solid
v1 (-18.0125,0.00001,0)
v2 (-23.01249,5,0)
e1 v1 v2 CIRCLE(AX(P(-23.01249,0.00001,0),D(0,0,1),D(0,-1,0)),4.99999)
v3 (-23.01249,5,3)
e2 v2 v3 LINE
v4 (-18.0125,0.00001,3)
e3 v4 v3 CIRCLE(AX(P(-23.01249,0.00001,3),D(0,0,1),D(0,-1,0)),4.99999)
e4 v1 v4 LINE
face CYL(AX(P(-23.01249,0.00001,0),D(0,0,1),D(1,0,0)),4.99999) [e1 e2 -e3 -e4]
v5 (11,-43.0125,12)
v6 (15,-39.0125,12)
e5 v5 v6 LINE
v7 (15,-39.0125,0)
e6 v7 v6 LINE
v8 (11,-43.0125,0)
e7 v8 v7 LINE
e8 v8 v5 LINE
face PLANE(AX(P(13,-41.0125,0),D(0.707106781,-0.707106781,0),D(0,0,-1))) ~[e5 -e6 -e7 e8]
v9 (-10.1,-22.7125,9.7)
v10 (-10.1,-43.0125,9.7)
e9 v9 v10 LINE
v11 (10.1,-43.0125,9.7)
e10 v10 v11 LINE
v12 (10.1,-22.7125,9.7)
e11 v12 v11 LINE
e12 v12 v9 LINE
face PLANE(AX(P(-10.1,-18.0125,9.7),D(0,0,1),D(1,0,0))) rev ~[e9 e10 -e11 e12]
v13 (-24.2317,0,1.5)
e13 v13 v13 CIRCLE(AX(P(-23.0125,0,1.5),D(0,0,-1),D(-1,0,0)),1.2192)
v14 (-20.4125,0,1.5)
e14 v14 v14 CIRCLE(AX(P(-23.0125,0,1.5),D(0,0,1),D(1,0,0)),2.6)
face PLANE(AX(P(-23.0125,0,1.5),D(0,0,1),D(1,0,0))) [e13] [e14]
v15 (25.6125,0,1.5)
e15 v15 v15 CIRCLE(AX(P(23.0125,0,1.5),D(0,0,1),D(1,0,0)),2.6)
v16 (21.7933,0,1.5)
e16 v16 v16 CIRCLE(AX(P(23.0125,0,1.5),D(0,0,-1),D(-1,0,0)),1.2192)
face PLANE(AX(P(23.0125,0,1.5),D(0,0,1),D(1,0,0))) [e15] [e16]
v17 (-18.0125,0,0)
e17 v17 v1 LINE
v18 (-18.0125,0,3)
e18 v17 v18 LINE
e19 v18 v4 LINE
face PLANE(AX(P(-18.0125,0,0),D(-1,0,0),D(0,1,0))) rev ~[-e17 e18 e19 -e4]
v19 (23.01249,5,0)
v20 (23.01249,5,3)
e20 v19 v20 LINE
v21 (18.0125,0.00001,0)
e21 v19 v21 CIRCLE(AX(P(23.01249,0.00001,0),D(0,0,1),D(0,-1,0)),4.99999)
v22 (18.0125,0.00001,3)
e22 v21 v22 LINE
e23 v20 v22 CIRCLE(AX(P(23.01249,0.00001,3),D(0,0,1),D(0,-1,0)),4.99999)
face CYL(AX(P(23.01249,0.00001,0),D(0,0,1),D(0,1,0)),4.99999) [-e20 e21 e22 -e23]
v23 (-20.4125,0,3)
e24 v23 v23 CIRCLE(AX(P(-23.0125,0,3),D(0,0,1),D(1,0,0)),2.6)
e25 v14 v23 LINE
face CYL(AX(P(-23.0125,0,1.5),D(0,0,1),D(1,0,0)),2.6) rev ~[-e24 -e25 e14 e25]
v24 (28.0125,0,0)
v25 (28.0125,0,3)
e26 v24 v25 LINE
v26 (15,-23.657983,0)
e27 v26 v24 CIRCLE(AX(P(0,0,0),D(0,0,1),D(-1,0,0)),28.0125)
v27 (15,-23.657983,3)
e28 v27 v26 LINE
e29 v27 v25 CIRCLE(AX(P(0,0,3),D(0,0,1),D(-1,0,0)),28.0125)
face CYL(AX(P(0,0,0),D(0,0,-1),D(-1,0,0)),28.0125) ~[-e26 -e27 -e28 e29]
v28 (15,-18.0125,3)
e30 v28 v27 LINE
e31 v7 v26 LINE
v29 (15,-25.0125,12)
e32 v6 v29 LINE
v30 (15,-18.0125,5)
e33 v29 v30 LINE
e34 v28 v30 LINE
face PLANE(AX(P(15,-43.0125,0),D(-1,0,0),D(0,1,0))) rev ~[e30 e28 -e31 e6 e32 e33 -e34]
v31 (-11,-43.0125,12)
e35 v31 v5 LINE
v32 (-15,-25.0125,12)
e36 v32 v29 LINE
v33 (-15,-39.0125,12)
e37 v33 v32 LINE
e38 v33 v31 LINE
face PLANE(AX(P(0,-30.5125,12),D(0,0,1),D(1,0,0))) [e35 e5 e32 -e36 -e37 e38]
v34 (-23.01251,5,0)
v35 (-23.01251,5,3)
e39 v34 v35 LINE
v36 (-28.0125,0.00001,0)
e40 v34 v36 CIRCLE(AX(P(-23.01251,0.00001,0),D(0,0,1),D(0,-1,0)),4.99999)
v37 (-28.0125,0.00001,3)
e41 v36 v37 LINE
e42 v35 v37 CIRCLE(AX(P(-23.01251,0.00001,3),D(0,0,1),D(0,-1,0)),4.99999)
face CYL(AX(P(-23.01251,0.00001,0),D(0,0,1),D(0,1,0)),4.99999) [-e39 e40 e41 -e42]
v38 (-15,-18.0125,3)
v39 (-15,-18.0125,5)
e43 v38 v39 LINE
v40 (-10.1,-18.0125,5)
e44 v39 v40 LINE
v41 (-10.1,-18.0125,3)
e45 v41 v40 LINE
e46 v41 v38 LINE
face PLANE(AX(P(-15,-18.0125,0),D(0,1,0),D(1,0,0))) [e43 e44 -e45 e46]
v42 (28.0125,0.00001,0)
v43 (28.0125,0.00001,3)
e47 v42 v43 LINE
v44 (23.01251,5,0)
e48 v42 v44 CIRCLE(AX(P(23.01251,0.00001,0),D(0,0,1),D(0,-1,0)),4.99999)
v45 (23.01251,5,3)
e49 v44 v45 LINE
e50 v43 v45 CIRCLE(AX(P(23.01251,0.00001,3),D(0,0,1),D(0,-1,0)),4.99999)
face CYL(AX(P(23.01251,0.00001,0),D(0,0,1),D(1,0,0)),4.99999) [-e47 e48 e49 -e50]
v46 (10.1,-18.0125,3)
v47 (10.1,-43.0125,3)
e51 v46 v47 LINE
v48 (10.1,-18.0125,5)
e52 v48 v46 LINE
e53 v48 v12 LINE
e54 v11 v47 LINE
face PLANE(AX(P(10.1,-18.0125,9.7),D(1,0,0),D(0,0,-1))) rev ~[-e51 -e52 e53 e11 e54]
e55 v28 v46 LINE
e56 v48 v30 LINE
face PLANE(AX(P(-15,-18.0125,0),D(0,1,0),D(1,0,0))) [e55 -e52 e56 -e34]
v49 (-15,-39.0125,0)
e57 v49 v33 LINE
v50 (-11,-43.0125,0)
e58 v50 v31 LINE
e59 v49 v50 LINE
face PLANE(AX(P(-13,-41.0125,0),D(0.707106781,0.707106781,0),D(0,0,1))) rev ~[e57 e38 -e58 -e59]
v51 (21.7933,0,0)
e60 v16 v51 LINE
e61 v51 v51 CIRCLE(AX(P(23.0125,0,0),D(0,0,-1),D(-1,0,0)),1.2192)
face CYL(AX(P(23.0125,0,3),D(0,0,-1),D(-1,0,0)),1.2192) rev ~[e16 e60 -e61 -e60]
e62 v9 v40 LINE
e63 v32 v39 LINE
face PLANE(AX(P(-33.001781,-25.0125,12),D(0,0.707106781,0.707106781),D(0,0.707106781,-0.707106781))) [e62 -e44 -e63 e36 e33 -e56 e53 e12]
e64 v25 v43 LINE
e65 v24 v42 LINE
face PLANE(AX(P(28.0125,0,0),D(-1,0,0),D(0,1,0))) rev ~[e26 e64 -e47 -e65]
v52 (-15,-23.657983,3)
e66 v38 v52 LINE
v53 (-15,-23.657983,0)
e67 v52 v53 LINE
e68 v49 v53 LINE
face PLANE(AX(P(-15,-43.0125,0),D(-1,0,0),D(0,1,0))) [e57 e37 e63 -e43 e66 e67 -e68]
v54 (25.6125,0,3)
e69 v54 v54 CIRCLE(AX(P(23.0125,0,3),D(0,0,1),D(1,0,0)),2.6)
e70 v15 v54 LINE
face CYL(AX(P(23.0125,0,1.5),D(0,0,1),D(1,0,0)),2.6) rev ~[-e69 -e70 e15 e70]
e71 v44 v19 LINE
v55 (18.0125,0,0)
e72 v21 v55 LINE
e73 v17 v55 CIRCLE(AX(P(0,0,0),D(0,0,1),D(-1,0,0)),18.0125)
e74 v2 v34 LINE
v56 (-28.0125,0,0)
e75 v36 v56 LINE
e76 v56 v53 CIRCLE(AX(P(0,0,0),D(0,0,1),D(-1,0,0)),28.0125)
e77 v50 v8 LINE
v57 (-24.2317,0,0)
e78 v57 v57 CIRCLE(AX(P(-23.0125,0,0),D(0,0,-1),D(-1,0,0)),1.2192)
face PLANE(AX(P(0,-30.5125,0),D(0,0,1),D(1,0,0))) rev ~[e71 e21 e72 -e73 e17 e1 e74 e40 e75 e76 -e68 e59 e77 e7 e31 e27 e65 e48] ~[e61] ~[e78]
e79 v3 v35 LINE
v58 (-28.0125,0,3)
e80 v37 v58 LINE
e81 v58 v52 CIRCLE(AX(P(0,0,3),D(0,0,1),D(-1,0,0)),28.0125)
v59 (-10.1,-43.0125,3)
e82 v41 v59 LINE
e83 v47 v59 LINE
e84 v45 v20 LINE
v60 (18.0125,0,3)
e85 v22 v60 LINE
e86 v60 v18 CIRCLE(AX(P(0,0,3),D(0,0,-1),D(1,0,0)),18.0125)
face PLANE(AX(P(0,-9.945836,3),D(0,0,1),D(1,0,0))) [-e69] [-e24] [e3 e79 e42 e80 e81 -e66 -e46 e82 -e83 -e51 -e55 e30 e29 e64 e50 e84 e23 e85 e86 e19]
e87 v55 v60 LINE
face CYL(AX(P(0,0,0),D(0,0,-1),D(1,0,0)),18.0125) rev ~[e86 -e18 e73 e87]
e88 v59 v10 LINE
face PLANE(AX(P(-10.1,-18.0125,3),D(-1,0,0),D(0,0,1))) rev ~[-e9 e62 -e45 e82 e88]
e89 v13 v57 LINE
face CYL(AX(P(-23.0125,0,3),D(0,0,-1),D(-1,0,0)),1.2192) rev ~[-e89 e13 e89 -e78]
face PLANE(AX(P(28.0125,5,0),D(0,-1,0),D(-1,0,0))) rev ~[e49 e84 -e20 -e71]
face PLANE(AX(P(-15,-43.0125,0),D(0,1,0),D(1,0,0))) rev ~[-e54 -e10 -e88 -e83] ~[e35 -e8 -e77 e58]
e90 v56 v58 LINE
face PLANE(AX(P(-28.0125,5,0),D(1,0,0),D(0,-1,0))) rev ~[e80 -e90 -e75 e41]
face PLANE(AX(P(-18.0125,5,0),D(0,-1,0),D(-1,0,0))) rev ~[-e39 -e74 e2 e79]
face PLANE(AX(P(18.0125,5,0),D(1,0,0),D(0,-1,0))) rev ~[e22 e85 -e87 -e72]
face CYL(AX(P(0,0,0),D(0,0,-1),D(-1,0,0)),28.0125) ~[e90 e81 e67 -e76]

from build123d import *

# Parameters (mm, degrees)
F1_DEPTH       = 3
F2_R           = 4.99999
F4_D           = 2.4384
F4_CBORE_D     = 5.2
F4_CBORE_DEPTH = 1.5
F5_W           = 30
F5_H           = 25
F6_DEPTH       = 12
F8_DEPTH       = 25.001
F9_T1_DEPTH    = 66.0035618315
F10_SIZE       = 4


# Not quite as in the source:
# - a fillet or chamfer that OpenCascade refuses, or shapes differently, is made with other operations: its cross-section is extruded or revolved along the edge and cut away or added
# - a fillet or chamfer is up to 0.001 mm smaller than in the source, because OpenCascade refuses the exact size


with BuildPart() as f1:
    # F0 (on Top) → F1 (new body)
    with BuildSketch(Plane.XY):
        with BuildLine():
            ThreePointArc((18.0125, 0), (0, -18.0125), (-18.0125, 0))
            Line((-18.0125, 0), (-18.0125, 5))
            Line((-18.0125, 5), (-28.0125, 5))
            Line((-28.0125, 5), (-28.0125, 0))
            ThreePointArc((-28.0125, 0), (0, -28.0125), (28.0125, 0))
            Line((28.0125, 0), (28.0125, 5))
            Line((28.0125, 5), (18.0125, 5))
            Line((18.0125, 5), (18.0125, 0))
        make_face()
    extrude(amount=F1_DEPTH)

    # F2 (radius 5 in the source; OpenCascade refuses exactly that, so slightly less here)
    f2_edges = [f1.edges().sort_by_distance(p)[0] for p in [
        (-28.0125, 5, 1.5),
        (-18.0125, 5, 1.5),
        (18.0125, 5, 1.5),
        (28.0125, 5, 1.5),
    ]]
    fillet(f2_edges, radius=F2_R)

    # F4 (through all)
    with Locations(Plane.XY.offset(3)):
        with Locations((-23.0125, 0), (23.0125, 0)):
            CounterBoreHole(F4_D / 2, F4_CBORE_D / 2, F4_CBORE_DEPTH)

    # F5 (on Top) → F6 (join)
    with BuildSketch(Plane.XY):
        with Locations((0, -30.5125)):
            Rectangle(F5_W, F5_H)
    extrude(amount=F6_DEPTH)

    # F7 (on face) → F8 (cut, through all)
    with BuildSketch(Plane(origin=(0, -18.0125, 0), x_dir=(-1, 0, 0), z_dir=(0, 1, 0))):
        Polygon((0, 3), (10.1, 3), (10.1, 9.7), (-10.1, 9.7), (-10.1, 3), align=None)
    extrude(amount=-F8_DEPTH, mode=Mode.SUBTRACT)

    # F9: chamfer of 7 on 1 edges, made by hand

    # F9_s2 → F9_t1 (cut)
    with BuildSketch(Plane.YZ.offset(-33.0017809158)):
        Polygon((-25.0125, 12), (-18.0125, 5), (-18.0125, 12), align=None)
    extrude(amount=F9_T1_DEPTH, mode=Mode.SUBTRACT)

    # F10
    f10_edges = [f1.edges().sort_by_distance(p)[0] for p in [
        (-15, -43.0125, 6),
        (15, -43.0125, 6),
    ]]
    chamfer(f10_edges, length=F10_SIZE)


solid = f1.part
